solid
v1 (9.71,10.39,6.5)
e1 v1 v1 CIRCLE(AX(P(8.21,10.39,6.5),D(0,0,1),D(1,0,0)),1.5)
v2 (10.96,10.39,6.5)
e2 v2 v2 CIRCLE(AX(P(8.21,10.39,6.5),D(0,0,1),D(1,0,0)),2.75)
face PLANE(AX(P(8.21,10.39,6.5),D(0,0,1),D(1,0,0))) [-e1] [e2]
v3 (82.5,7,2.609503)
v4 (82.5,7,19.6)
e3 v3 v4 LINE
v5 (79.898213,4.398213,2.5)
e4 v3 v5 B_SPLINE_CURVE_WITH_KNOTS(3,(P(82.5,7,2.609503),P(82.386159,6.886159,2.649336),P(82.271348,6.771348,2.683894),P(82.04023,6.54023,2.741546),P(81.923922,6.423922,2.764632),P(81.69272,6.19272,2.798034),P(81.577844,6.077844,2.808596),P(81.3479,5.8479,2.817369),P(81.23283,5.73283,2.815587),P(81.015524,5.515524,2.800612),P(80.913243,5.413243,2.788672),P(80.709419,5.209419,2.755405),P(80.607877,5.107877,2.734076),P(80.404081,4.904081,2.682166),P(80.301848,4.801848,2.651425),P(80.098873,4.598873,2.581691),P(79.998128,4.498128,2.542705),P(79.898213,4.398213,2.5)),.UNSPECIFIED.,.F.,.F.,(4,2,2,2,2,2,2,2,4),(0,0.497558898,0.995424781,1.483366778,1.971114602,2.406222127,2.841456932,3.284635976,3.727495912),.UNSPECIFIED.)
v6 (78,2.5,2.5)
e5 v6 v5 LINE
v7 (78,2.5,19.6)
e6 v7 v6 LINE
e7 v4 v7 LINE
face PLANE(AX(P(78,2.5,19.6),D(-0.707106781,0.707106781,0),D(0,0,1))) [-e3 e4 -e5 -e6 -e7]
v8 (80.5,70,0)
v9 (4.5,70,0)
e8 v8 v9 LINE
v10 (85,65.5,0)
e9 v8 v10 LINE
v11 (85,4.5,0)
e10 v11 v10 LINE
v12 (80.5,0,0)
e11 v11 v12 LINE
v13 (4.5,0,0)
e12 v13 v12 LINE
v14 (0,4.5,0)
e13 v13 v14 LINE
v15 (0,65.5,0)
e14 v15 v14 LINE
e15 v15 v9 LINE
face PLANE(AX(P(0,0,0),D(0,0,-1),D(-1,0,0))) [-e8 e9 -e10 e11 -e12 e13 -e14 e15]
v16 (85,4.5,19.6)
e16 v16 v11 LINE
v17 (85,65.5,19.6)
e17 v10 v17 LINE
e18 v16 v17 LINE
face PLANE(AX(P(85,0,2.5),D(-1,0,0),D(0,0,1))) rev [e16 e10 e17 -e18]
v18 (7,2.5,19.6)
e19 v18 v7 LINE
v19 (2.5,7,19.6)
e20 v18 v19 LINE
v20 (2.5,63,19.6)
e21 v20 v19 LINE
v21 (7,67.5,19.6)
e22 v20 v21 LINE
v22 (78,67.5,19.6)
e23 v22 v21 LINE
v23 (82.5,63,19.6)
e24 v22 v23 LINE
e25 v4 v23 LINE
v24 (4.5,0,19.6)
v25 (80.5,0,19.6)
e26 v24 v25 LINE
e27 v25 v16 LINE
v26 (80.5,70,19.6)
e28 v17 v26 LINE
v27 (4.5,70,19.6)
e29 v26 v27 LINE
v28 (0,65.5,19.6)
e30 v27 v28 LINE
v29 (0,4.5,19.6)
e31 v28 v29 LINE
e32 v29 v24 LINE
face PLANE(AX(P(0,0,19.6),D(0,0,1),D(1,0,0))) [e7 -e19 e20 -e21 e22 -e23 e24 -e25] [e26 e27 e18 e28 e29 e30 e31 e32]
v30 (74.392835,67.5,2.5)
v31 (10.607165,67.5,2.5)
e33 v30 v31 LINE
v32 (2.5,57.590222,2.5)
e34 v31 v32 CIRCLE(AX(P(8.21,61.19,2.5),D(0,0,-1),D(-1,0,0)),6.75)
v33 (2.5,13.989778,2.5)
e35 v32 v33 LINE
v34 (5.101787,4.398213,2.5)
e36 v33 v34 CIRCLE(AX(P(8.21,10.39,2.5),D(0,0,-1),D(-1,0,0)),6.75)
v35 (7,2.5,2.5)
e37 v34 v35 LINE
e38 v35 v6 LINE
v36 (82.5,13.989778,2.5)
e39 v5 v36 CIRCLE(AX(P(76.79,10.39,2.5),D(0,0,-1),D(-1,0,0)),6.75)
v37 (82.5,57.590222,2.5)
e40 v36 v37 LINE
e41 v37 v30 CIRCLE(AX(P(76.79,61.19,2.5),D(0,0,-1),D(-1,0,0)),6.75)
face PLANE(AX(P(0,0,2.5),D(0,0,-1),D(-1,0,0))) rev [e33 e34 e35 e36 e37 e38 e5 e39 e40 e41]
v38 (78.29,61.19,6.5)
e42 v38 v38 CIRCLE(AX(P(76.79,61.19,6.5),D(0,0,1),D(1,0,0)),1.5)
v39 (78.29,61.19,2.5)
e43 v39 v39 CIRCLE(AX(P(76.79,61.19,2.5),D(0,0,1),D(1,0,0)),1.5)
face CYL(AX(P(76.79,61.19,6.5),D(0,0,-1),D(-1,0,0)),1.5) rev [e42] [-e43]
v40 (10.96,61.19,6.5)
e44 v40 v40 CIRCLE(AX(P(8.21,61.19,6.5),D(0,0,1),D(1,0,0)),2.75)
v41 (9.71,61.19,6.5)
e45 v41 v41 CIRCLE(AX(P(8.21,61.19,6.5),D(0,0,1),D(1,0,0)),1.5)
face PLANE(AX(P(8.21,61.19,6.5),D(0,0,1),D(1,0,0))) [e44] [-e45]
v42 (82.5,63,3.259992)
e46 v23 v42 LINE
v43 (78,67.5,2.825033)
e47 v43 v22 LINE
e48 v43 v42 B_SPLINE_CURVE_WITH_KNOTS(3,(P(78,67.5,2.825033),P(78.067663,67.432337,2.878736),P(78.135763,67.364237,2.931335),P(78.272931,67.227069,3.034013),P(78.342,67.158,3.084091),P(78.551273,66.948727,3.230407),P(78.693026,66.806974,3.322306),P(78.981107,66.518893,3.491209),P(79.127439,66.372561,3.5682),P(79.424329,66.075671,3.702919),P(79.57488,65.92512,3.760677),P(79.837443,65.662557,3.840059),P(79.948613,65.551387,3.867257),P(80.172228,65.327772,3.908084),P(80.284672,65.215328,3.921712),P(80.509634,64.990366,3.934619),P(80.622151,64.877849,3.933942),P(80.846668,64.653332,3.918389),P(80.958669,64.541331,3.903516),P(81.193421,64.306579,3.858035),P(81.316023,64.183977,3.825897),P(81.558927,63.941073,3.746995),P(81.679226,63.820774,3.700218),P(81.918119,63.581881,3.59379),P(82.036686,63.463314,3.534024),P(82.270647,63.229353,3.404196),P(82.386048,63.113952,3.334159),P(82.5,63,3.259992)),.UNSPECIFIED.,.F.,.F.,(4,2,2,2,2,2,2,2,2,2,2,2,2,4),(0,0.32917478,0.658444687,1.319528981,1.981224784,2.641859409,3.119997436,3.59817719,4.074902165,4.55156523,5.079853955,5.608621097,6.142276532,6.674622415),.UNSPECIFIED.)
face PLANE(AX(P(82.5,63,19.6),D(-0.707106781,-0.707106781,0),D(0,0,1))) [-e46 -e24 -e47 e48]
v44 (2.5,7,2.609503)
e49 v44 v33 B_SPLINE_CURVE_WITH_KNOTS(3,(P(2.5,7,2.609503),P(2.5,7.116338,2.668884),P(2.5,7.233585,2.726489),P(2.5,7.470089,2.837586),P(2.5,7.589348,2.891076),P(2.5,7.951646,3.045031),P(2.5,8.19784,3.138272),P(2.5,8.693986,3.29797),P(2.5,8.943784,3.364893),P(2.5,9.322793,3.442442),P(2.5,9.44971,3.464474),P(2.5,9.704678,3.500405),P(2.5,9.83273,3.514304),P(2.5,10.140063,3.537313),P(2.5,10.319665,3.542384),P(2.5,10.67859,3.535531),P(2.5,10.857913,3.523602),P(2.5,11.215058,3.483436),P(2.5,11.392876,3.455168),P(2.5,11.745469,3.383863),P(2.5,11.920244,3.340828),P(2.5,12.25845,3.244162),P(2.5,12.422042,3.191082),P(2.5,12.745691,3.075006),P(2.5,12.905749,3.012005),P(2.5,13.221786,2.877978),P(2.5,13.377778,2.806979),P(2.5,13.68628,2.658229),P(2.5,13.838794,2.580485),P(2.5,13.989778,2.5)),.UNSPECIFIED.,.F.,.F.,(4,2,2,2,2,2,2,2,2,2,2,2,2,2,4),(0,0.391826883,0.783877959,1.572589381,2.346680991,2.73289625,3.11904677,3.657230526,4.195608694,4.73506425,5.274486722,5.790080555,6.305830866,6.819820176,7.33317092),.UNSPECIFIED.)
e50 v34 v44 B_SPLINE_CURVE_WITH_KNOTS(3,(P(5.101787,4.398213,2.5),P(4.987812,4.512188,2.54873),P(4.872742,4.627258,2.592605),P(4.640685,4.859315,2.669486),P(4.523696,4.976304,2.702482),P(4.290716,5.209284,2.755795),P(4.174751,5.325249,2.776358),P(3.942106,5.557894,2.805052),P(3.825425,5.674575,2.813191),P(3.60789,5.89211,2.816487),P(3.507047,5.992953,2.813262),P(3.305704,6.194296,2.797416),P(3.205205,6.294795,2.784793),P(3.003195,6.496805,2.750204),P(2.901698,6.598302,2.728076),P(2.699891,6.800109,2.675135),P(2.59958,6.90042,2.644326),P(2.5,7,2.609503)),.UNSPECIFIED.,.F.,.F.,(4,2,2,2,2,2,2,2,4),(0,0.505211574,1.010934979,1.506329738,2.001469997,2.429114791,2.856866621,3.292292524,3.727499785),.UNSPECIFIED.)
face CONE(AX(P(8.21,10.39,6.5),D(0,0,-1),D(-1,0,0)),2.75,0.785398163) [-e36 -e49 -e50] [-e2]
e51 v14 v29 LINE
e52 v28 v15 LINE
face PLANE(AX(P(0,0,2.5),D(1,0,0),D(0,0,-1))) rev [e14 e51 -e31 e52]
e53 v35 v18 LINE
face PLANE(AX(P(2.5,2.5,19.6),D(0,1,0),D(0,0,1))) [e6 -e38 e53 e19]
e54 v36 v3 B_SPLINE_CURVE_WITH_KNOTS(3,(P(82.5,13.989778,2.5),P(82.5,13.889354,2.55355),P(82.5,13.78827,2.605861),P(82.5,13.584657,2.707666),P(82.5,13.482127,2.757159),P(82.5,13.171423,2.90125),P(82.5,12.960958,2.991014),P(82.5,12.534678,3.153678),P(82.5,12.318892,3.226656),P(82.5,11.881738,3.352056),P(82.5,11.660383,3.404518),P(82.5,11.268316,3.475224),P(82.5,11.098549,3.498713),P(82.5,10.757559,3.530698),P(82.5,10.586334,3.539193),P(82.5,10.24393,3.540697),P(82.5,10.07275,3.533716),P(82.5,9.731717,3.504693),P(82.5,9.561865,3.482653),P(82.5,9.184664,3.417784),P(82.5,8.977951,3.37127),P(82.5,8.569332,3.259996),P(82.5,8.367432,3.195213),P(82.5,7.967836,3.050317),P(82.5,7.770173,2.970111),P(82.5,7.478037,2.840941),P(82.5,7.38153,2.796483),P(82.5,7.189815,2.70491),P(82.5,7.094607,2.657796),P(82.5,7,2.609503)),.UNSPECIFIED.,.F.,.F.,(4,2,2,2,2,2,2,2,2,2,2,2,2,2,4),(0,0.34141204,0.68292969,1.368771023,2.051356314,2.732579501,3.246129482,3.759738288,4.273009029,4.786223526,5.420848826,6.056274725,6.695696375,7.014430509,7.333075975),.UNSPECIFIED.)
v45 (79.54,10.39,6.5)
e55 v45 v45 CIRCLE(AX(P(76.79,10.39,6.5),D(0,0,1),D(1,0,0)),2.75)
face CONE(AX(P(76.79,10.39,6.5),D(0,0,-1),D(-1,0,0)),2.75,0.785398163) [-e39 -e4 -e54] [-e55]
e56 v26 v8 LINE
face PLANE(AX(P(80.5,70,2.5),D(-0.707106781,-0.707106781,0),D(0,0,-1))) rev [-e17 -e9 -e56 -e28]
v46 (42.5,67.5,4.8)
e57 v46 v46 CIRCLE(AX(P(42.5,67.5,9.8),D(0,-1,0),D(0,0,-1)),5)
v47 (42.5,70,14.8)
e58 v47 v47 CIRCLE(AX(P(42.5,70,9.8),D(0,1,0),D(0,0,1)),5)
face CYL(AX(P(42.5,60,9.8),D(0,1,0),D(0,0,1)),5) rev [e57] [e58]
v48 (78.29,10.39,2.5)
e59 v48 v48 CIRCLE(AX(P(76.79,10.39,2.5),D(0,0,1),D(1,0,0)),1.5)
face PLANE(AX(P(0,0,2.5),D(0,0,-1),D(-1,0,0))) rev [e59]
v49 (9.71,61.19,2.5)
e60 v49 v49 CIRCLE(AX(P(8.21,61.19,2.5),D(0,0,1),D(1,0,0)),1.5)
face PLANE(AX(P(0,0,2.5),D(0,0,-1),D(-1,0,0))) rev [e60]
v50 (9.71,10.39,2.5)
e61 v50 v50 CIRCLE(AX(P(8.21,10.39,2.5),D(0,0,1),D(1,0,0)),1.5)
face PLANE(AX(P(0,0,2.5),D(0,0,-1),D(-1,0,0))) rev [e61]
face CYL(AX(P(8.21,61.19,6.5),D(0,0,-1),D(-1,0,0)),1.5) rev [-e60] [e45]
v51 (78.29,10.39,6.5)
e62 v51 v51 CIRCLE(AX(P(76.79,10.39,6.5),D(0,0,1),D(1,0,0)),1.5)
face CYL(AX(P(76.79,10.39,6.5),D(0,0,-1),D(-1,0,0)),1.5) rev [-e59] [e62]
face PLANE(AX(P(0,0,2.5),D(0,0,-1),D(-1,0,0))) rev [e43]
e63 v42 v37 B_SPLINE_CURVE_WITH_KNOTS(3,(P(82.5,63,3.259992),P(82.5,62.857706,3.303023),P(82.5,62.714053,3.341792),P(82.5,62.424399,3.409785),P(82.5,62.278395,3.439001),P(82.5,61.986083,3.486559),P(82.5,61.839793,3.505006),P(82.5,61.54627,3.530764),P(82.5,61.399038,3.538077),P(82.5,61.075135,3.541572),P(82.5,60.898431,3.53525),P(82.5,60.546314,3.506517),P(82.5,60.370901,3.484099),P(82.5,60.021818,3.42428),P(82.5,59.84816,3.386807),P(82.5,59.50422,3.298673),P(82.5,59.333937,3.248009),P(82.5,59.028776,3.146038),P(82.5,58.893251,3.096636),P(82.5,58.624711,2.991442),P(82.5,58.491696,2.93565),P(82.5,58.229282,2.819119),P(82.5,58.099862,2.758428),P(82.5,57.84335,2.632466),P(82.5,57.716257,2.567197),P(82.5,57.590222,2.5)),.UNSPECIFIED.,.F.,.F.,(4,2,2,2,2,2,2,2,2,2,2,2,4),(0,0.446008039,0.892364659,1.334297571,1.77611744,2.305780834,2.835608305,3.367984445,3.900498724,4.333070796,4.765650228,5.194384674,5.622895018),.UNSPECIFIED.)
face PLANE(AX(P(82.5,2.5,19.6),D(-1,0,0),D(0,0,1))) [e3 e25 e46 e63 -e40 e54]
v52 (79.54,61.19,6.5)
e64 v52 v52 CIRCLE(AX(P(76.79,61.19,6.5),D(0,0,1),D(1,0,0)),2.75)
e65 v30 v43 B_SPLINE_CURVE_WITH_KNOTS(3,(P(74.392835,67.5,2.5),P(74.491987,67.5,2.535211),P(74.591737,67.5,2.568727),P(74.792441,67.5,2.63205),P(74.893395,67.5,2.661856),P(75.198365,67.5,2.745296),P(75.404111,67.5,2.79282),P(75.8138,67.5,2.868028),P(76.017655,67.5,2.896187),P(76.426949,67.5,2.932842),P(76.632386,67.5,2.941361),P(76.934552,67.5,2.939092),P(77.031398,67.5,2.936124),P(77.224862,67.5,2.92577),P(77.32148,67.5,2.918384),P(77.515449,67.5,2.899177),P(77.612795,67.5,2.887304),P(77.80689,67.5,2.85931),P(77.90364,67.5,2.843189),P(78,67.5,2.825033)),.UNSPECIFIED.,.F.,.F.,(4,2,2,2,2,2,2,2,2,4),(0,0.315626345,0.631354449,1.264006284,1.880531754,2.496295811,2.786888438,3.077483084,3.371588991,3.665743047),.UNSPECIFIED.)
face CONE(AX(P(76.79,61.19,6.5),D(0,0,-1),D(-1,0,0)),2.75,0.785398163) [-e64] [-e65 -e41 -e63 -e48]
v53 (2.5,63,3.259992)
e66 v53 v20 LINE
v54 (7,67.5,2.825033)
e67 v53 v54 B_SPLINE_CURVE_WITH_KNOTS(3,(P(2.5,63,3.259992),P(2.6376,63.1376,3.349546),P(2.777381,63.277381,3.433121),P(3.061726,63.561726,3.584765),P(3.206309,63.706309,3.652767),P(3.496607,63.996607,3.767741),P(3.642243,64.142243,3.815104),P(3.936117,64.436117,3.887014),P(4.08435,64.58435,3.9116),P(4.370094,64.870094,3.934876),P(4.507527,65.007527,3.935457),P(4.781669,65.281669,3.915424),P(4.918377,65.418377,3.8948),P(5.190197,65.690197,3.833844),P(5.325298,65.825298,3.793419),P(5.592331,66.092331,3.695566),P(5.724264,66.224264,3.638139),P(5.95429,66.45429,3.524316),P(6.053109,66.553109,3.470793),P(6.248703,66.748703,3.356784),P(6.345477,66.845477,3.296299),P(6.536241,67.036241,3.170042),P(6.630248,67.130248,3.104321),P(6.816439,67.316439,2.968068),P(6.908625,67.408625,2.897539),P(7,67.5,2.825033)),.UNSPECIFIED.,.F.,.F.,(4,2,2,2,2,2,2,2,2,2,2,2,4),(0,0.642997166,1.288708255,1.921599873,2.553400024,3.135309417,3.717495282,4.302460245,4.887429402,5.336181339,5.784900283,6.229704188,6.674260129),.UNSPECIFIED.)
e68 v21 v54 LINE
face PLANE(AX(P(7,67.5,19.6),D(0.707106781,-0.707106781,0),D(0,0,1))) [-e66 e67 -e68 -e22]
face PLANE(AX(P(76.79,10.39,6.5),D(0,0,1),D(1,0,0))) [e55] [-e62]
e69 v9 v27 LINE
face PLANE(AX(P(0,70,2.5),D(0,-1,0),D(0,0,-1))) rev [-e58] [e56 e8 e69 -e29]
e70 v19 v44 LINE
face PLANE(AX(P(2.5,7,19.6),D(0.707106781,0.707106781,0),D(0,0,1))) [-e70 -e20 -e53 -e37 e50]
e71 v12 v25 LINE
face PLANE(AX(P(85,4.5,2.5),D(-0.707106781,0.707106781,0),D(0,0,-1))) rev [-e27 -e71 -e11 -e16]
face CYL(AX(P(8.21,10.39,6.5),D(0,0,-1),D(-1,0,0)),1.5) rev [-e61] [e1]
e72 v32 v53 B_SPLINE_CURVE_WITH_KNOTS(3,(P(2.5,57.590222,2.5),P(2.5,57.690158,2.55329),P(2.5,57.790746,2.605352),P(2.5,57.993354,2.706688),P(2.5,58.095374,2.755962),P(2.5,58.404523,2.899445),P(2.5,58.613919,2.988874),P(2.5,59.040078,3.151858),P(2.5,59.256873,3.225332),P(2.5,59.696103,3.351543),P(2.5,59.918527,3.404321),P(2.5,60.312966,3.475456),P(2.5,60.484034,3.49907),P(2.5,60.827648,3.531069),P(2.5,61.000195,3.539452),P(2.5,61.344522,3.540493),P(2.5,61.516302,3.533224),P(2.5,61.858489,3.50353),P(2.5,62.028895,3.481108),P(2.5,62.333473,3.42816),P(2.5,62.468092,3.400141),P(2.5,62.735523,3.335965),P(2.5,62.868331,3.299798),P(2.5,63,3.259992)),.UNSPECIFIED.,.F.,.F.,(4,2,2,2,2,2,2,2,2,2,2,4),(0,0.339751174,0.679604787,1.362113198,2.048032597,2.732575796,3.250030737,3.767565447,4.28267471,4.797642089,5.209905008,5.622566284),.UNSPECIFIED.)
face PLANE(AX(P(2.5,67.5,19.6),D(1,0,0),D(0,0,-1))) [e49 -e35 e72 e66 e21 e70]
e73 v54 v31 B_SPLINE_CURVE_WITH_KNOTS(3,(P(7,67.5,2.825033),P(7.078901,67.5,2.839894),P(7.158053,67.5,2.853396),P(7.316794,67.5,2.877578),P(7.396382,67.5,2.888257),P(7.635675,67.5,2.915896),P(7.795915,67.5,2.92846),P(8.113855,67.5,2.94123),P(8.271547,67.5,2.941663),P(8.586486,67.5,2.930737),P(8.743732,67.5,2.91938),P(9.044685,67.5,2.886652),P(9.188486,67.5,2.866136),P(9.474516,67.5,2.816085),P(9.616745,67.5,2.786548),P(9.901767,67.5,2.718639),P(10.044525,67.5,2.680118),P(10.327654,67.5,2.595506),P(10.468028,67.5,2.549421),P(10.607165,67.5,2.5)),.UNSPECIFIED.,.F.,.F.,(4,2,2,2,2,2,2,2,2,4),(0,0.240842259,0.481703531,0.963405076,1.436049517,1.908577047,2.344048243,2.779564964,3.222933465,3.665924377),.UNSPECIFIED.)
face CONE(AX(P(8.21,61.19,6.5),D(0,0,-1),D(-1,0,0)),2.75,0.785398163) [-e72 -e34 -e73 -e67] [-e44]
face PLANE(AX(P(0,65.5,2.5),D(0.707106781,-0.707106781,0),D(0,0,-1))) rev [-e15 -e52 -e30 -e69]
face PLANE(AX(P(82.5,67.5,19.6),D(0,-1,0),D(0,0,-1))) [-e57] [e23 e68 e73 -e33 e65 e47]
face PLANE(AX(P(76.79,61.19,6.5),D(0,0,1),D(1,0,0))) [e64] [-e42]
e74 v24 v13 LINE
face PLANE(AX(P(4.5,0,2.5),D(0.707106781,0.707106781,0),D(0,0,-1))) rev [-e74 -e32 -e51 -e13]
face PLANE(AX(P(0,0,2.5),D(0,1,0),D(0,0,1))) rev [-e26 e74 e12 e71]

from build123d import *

# Parameters (mm, degrees)
ESQUISSE1_W             = 85
ESQUISSE1_H             = 70
BOSS_EXTRU_1_DEPTH      = 2.5
ESQUISSE2_W             = 85
ESQUISSE2_H             = 70
ESQUISSE2_W_2           = 80
ESQUISSE2_H_2           = 65
BOSS_EXTRU_2_DEPTH      = 17.1
ESQUISSE3_R             = 2.75
ESQUISSE3_R_2           = 1.5
BOSS_EXTRU_3_DEPTH      = 4
CHANFREIN1_SIZE         = 4.5
CHANFREIN2_SIZE         = 4
ESQUISSE4_R             = 5
ENL_V_MAT_EXTRU_1_DEPTH = 10


with BuildPart() as part:
    # Esquisse1 → Boss.-Extru.1 (new body)
    with BuildSketch(Plane.XY):
        with Locations((42.5, 35)):
            Rectangle(ESQUISSE1_W, ESQUISSE1_H)
    extrude(amount=BOSS_EXTRU_1_DEPTH)

    # Esquisse2 → Boss.-Extru.2 (add)
    with BuildSketch(Plane.XY.offset(2.5)):
        with Locations((42.5, 35)):
            Rectangle(ESQUISSE2_W, ESQUISSE2_H)
        with Locations((42.5, 35)):
            Rectangle(ESQUISSE2_W_2, ESQUISSE2_H_2, mode=Mode.SUBTRACT)
    extrude(amount=BOSS_EXTRU_2_DEPTH)

    # Esquisse3 → Boss.-Extru.3 (add)
    # profile 1 of 4: a face of its own
    with BuildSketch(Plane.XY.offset(2.5)):
        with Locations(Location((8.21, 61.19, 0), (0, 0, 180))):
            Circle(ESQUISSE3_R)
        with Locations((8.21, 61.19)):
            Circle(ESQUISSE3_R_2, mode=Mode.SUBTRACT)
    # profile 2 of 4: a face of its own
    with BuildSketch(Plane.XY.offset(2.5)):
        with Locations(Location((76.79, 61.19, 0), (0, 0, 180))):
            Circle(ESQUISSE3_R)
        with Locations((76.79, 61.19)):
            Circle(ESQUISSE3_R_2, mode=Mode.SUBTRACT)
    # profile 3 of 4: a face of its own
    with BuildSketch(Plane.XY.offset(2.5)):
        with Locations(Location((76.79, 10.39, 0), (0, 0, 180))):
            Circle(ESQUISSE3_R)
        with Locations((76.79, 10.39)):
            Circle(ESQUISSE3_R_2, mode=Mode.SUBTRACT)
    # profile 4 of 4: a face of its own
    with BuildSketch(Plane.XY.offset(2.5)):
        with Locations(Location((8.21, 10.39, 0), (0, 0, 180))):
            Circle(ESQUISSE3_R)
        with Locations((8.21, 10.39)):
            Circle(ESQUISSE3_R_2, mode=Mode.SUBTRACT)
    extrude(amount=BOSS_EXTRU_3_DEPTH)

    # Chanfrein1
    chanfrein1_edges = [part.edges().sort_by_distance(p)[0] for p in [
        (2.5, 67.5, 11.05),
        (2.5, 2.5, 11.05),
        (82.5, 2.5, 11.05),
        (82.5, 67.5, 11.05),
        (0, 70, 9.8),
        (85, 70, 9.8),
        (85, 0, 9.8),
        (0, 0, 9.8),
    ]]
    chamfer(chanfrein1_edges, length=CHANFREIN1_SIZE)

    # Chanfrein2
    # the kernel refuses this chamfer: 4 mm, written as the material it adds along each edge
    with BuildSketch(Plane(origin=(8.21, 10.39, 2.5), x_dir=(-1, 0, 0), z_dir=(0, 1, 0))) as chanfrein2_piece_1_section:
        Polygon((2.75 + CHANFREIN2_SIZE, 0), (2.75, CHANFREIN2_SIZE), (2.75, 0), align=None)
    chanfrein2_piece_1 = revolve(axis=Axis((8.21, 10.39, 2.5), (0, 0, 1)), mode=Mode.PRIVATE)
    chanfrein2_piece_1 = split(chanfrein2_piece_1, bisect_by=Plane(origin=(12.973571243, 10.39, 6.5), z_dir=(0, 0, -1)), keep=Keep.TOP, mode=Mode.PRIVATE)
    add(chanfrein2_piece_1)
    with BuildSketch(Plane(origin=(76.79, 10.39, 2.5), x_dir=(-1, 0, 0), z_dir=(0, 1, 0))) as chanfrein2_piece_2_section:
        Polygon((2.75 + CHANFREIN2_SIZE, 0), (2.75, CHANFREIN2_SIZE), (2.75, 0), align=None)
    chanfrein2_piece_2 = revolve(axis=Axis((76.79, 10.39, 2.5), (0, 0, 1)), mode=Mode.PRIVATE)
    chanfrein2_piece_2 = split(chanfrein2_piece_2, bisect_by=Plane(origin=(81.553571243, 10.39, 6.5), z_dir=(0, 0, -1)), keep=Keep.TOP, mode=Mode.PRIVATE)
    add(chanfrein2_piece_2)
    with BuildSketch(Plane(origin=(76.79, 61.19, 2.5), x_dir=(-1, 0, 0), z_dir=(0, 1, 0))) as chanfrein2_piece_3_section:
        Polygon((2.75 + CHANFREIN2_SIZE, 0), (2.75, CHANFREIN2_SIZE), (2.75, 0), align=None)
    chanfrein2_piece_3 = revolve(axis=Axis((76.79, 61.19, 2.5), (0, 0, 1)), mode=Mode.PRIVATE)
    chanfrein2_piece_3 = split(chanfrein2_piece_3, bisect_by=Plane(origin=(81.553571243, 61.19, 6.5), z_dir=(0, 0, -1)), keep=Keep.TOP, mode=Mode.PRIVATE)
    add(chanfrein2_piece_3)
    with BuildSketch(Plane(origin=(8.21, 61.19, 2.5), x_dir=(-1, 0, 0), z_dir=(0, 1, 0))) as chanfrein2_piece_4_section:
        Polygon((2.75 + CHANFREIN2_SIZE, 0), (2.75, CHANFREIN2_SIZE), (2.75, 0), align=None)
    chanfrein2_piece_4 = revolve(axis=Axis((8.21, 61.19, 2.5), (0, 0, 1)), mode=Mode.PRIVATE)
    chanfrein2_piece_4 = split(chanfrein2_piece_4, bisect_by=Plane(origin=(12.973571243, 61.19, 6.5), z_dir=(0, 0, -1)), keep=Keep.TOP, mode=Mode.PRIVATE)
    add(chanfrein2_piece_4)

    # Esquisse4 → Enlèv. mat.-Extru.1 (cut)
    with BuildSketch(Plane(origin=(0, 70, 0), x_dir=(1, 0, 0), z_dir=(0, 1, 0))):
        with Locations(Location((42.5, -9.8, 0), (0, 0, 270))):
            Circle(ESQUISSE4_R)
    extrude(amount=-ENL_V_MAT_EXTRU_1_DEPTH, mode=Mode.SUBTRACT)


solid = part.part
